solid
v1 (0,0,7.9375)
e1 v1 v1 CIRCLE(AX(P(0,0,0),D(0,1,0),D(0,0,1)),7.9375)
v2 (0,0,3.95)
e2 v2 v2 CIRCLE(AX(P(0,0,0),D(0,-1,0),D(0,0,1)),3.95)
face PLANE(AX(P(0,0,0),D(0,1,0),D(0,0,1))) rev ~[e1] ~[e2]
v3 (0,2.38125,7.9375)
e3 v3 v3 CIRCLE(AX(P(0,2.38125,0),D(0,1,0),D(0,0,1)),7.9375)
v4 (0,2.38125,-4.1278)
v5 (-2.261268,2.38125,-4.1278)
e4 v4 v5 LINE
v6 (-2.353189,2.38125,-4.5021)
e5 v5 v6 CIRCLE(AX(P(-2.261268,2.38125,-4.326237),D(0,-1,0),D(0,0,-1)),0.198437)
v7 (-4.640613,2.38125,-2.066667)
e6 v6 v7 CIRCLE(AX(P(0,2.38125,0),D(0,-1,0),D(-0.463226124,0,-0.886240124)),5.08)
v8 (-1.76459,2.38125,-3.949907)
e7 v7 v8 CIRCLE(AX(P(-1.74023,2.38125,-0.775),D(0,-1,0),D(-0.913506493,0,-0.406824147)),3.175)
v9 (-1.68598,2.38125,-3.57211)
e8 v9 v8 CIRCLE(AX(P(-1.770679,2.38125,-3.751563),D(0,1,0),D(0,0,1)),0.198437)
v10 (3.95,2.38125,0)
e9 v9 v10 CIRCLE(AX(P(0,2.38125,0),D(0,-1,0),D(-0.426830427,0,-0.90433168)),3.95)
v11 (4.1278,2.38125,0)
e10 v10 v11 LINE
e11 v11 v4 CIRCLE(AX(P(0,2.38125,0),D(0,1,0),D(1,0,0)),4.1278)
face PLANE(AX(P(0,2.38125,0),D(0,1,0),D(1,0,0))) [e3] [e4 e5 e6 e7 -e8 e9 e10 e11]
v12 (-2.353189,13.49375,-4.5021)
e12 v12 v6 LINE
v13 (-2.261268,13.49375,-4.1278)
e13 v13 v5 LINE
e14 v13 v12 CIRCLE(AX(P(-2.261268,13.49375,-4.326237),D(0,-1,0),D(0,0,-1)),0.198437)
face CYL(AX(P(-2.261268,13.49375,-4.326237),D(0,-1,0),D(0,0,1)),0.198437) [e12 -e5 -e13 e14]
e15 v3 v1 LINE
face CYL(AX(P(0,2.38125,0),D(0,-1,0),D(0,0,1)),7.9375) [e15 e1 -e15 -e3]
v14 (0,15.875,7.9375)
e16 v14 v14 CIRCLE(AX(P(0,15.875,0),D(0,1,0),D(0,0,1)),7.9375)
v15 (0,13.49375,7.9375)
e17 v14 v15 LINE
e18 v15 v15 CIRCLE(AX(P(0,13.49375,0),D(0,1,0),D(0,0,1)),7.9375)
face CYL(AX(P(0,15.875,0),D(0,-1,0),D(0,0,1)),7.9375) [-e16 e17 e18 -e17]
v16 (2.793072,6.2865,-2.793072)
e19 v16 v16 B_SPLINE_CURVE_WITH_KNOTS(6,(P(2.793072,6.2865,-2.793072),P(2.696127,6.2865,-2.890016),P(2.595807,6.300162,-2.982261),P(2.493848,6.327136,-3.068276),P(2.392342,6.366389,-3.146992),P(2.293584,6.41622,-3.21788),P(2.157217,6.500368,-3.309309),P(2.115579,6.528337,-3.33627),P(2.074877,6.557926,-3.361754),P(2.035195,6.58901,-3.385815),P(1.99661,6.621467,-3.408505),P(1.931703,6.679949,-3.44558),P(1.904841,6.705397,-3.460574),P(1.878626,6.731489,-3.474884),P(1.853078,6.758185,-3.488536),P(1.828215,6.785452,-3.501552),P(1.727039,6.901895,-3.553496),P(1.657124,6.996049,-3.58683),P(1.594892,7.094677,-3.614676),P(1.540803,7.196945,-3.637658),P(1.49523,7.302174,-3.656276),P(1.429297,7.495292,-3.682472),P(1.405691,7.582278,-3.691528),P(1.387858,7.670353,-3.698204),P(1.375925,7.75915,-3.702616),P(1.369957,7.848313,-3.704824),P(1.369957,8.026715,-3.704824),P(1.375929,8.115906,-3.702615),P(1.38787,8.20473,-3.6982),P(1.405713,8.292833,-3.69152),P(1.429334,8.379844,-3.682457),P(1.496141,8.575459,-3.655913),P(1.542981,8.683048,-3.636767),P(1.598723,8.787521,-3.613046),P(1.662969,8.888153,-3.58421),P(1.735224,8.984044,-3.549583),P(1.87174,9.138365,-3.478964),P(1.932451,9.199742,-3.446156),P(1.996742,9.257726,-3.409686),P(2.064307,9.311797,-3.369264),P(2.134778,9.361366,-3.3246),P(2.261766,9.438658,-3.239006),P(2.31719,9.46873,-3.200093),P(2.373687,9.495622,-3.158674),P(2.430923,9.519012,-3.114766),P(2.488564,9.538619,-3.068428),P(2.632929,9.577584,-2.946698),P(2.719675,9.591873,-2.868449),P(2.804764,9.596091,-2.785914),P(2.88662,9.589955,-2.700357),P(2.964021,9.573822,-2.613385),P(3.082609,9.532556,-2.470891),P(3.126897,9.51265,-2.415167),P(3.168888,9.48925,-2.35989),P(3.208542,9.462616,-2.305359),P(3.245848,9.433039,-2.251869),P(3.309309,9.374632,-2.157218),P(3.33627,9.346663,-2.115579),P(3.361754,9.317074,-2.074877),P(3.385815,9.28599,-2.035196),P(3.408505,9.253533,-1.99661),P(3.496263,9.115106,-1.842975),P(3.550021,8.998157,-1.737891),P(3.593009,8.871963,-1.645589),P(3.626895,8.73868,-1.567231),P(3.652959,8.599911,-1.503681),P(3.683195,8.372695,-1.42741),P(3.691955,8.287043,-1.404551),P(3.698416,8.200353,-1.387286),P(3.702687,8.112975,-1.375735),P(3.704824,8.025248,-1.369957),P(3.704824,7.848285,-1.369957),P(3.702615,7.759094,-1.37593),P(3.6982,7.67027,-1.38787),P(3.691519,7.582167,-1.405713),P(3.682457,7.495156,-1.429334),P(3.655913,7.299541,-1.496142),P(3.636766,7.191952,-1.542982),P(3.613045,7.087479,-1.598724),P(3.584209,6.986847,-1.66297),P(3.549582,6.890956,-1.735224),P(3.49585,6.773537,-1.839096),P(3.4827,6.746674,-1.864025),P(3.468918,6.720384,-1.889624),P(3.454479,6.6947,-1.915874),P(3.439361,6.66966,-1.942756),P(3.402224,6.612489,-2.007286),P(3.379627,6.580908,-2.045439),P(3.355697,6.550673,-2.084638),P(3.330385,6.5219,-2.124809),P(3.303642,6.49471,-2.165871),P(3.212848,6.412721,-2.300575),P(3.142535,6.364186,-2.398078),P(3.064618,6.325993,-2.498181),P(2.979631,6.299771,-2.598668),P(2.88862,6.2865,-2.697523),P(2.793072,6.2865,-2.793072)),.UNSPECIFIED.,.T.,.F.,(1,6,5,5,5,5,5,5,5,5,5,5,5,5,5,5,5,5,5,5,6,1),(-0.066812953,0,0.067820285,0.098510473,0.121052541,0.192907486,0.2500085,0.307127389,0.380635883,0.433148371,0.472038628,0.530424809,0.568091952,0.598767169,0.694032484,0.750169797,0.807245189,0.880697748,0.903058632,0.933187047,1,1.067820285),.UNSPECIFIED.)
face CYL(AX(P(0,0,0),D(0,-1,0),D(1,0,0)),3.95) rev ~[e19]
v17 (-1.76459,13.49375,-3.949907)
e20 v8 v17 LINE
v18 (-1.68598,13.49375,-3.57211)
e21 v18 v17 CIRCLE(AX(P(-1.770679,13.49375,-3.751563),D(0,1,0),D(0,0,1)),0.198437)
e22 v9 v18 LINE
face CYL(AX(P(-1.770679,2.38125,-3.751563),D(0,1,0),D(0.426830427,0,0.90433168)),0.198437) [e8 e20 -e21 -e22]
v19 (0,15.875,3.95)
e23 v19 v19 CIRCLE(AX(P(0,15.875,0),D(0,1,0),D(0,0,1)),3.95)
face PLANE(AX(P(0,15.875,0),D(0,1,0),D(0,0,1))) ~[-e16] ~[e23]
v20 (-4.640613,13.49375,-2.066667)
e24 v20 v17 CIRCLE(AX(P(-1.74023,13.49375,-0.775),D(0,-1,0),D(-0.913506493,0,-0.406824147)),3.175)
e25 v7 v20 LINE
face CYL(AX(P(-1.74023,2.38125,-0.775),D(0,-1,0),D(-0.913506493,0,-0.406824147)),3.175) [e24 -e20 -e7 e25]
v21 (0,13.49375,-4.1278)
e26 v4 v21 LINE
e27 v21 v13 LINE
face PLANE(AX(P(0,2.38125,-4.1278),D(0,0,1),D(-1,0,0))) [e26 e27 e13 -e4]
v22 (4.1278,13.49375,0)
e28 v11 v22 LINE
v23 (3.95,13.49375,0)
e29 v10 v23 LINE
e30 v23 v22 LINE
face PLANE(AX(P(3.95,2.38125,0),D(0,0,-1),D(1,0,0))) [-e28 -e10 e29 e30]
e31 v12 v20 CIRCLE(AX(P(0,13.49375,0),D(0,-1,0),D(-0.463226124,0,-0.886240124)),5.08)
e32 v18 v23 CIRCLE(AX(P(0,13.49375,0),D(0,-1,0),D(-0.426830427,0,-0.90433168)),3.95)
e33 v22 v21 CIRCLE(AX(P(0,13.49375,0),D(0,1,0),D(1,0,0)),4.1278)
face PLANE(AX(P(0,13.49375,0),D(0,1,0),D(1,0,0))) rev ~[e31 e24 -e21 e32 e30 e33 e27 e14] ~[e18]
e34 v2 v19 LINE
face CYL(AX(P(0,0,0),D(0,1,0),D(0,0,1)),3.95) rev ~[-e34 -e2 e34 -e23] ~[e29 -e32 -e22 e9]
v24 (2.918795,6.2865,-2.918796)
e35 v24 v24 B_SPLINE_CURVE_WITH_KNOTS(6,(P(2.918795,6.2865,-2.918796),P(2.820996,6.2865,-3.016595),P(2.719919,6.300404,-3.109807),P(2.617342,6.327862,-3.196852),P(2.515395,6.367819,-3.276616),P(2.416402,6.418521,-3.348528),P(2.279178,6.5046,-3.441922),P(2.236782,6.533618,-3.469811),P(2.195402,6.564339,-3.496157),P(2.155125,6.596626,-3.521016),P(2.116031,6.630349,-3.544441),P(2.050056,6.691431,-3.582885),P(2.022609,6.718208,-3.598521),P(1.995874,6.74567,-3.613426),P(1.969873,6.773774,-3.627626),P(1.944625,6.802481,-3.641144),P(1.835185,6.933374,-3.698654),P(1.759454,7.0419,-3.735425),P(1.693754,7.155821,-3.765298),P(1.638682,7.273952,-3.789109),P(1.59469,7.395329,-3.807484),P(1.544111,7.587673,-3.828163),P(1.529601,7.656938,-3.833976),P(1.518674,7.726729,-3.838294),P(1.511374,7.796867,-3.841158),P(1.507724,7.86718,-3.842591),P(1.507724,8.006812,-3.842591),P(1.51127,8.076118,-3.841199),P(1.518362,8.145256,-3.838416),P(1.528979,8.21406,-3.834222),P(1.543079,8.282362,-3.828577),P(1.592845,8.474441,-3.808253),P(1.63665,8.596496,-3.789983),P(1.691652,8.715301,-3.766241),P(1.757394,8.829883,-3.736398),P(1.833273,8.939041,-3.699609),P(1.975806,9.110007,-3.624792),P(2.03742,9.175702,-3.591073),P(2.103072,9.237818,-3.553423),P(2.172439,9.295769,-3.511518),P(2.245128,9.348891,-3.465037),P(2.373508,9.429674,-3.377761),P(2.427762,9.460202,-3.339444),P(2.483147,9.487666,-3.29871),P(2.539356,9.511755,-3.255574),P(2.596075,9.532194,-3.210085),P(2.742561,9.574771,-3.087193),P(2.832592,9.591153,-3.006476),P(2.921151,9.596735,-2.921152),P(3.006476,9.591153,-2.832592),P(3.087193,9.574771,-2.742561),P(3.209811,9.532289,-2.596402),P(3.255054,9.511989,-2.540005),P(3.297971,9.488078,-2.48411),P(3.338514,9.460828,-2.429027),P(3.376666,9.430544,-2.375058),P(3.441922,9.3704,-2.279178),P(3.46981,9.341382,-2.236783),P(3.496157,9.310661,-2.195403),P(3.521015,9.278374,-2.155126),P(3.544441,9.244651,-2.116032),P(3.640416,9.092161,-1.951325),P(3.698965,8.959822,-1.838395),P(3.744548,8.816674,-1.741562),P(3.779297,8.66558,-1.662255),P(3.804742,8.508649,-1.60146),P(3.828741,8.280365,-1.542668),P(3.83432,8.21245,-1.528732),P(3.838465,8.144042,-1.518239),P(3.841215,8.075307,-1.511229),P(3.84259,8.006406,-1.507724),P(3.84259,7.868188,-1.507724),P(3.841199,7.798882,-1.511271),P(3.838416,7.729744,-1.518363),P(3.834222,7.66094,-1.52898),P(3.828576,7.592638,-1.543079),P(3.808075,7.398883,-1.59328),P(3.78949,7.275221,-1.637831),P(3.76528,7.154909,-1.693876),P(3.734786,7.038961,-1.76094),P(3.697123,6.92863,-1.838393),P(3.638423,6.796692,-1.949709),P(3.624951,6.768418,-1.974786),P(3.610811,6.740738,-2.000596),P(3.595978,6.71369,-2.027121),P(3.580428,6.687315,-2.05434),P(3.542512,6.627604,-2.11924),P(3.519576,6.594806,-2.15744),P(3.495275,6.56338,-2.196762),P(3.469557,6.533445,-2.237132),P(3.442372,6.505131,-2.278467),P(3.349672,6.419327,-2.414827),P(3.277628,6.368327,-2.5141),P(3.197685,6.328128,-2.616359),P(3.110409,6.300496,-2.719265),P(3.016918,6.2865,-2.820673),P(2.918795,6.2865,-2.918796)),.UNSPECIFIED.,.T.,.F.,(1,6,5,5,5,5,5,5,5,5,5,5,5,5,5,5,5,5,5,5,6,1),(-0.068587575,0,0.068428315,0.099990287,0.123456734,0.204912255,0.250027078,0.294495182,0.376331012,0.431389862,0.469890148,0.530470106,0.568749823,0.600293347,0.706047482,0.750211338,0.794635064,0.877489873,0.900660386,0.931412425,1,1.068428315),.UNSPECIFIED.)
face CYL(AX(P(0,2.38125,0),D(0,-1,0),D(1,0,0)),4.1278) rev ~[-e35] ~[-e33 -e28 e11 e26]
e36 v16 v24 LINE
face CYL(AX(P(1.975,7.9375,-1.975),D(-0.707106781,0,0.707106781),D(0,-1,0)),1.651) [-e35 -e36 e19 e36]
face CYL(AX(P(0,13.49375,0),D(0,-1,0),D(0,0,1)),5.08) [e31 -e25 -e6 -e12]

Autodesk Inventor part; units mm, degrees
ref_plane "YZ Plane" through (0, 0, 0) normal (1, 0, 0) x (0, 1, 0)
ref_plane "XZ Plane" through (0, 0, 0) normal (0, 1, 0) x (-1, 0, 0)
ref_plane "XY Plane" through (0, 0, 0) normal (0, 0, 1) x (1, 0, 0)
sketch "Sketch1" plane through (0, 0, 0) normal (1, 0, 0) x (0, 1, 0)
  line L0 (0, 0) -> (15.875, 0)
  line L1 (15.875, 0) -> (15.875, 5.08)
  line L2 (15.875, 5.08) -> (0, 5.08)
  line L3 (0, 5.08) -> (0, 0)
  line L4 (15.875, 5.08) -> (13.49375, 5.08)
  line L5 (13.49375, 5.08) -> (13.49375, 7.9375)
  line L6 (13.49375, 7.9375) -> (15.875, 7.9375)
  line L7 (15.875, 7.9375) -> (15.875, 5.08)
  line L8 (0, 5.08) -> (2.38125, 5.08)
  line L9 (2.38125, 5.08) -> (2.38125, 7.9375)
  line L10 (2.38125, 7.9375) -> (0, 7.9375)
  line L11 (0, 7.9375) -> (0, 5.08)
  line L12 (15.875, 3.95) -> (0, 3.95)
  line L13 (0, 3.95) -> (0, 0)
  line L14 (0, 0) -> (15.875, 0)
  line L15 (15.875, 0) -> (15.875, 3.95)
  point P0 (0, 3.95)
  dimension "d0" = 15.875
  dimension "d1" = 5.08
  dimension "d2" = 2.38125
  dimension "d3" = 2.38125
  dimension "d4" = 7.9375
  dimension "d5" = 3.95
sketch "Sketch1 outline for Revolution1" plane through (0, 0, 0) normal (1, 0, 0) x (0, 1, 0)
  line L0 (15.875, 5.08) -> (15.875, 7.9375)
  line L1 (15.875, 3.95) -> (15.875, 5.08)
  line L2 (0, 3.95) -> (15.875, 3.95)
  line L3 (0, 5.08) -> (0, 3.95)
  line L4 (0, 7.9375) -> (0, 5.08)
  line L5 (2.38125, 7.9375) -> (0, 7.9375)
  line L6 (2.38125, 5.08) -> (2.38125, 7.9375)
  line L7 (13.49375, 5.08) -> (2.38125, 5.08)
  line L8 (13.49375, 7.9375) -> (13.49375, 5.08)
  line L9 (15.875, 7.9375) -> (13.49375, 7.9375)
revolve "Revolution1" add sketch "Sketch1 outline for Revolution1" angle 360 about axis through (0, 0, 0) along (0, 1, 0)
sketch "Sketch2" plane through (0, 2.38125, 0) normal (0, 1, 0) x (1, 0, 0)
  circle A0 centre (0, 0) radius 3.95
  circle A1 centre (0, 0) radius 4.1278
  line L0 (3.95, 0) -> (4.1278, 0)
  line L1 (0, 3.95) -> (0, 4.1278)
  circle A2 centre (0, 0) radius 5.08
  line L2 (0, 4.1278) -> (-3.194354, 4.1278)
  line L3 (-3.194354, 4.1278) -> (-3.194354, 3.95)
  line L4 (-3.194354, 3.95) -> (0, 3.95)
  line L5 (0, 3.95) -> (0, 4.1278)
  point P0 (0, 0)
  dimension "d7" = 0.1778
sketch "Sketch2 outline for Extrusion1" plane through (0, 2.38125, 0) normal (0, 1, 0) x (1, 0, 0)
  line L0 (-3.194354, 3.95) -> (0, 3.95)
  line L1 (-3.194354, 4.1278) -> (-3.194354, 3.95)
  line L2 (0, 4.1278) -> (-3.194354, 4.1278)
  arc A0 (4.1278, 0) -> (0, 4.1278) centre (0, 0) ccw
  line L3 (3.95, 0) -> (4.1278, 0)
  arc A1 (0, 3.95) -> (3.95, 0) centre (0, 0) cw
extrude "Extrusion1" cut sketch "Sketch2 outline for Extrusion1" along normal up to surface (11.1125 mm away)
ref_plane "Work Plane1" through (3.95, 7.9375, 0) normal (0.7071068, 0, -0.7071068) x (0, -1, 0)
sketch "Sketch3" plane through (3.95, 7.9375, 0) normal (0.7071068, 0, -0.7071068) x (0, -1, 0)
  line L0 (7.9375, 2.793072) -> (-7.9375, 2.793072) construction
  line L1 (-7.9375, 6.743072) -> (-7.9375, -1.156928)
  circle A0 centre (0, 2.793072) radius 1.651
  dimension "d12" = 3.302
sketch "Sketch3 outline for Extrusion2" plane through (3.95, 7.9375, 0) normal (0.7071068, 0, -0.7071068) x (0, -1, 0)
  circle A0 centre (0, 2.793072) radius 1.651
extrude "Extrusion2" add sketch "Sketch3 outline for Extrusion2" along normal blind 1.5875
sketch "Sketch4" plane through (0, 0, 0) normal (0, -1, 0) x (1, 0, 0)
  circle A0 centre (0, 0) radius 3.95 projected
  point P0 (0, 0)
sketch "Sketch4 outline for Extrusion3" plane through (0, 0, 0) normal (0, -1, 0) x (1, 0, 0)
  circle A0 centre (0, 0) radius 3.95
extrude "Extrusion3" cut sketch "Sketch4 outline for Extrusion3" against normal through all
fillet "Fillet1" radius 0.198437 2 edges at (0, 7.9375, -3.95) (-2.961, 7.9375, -4.1278)
fillet "Fillet2" radius 3.175 1 edges at (-3.1944, 7.9375, -3.95)
equation "\"d3\" = d2"
properties part number "Spring Spool" material "Nylon 6/6"
